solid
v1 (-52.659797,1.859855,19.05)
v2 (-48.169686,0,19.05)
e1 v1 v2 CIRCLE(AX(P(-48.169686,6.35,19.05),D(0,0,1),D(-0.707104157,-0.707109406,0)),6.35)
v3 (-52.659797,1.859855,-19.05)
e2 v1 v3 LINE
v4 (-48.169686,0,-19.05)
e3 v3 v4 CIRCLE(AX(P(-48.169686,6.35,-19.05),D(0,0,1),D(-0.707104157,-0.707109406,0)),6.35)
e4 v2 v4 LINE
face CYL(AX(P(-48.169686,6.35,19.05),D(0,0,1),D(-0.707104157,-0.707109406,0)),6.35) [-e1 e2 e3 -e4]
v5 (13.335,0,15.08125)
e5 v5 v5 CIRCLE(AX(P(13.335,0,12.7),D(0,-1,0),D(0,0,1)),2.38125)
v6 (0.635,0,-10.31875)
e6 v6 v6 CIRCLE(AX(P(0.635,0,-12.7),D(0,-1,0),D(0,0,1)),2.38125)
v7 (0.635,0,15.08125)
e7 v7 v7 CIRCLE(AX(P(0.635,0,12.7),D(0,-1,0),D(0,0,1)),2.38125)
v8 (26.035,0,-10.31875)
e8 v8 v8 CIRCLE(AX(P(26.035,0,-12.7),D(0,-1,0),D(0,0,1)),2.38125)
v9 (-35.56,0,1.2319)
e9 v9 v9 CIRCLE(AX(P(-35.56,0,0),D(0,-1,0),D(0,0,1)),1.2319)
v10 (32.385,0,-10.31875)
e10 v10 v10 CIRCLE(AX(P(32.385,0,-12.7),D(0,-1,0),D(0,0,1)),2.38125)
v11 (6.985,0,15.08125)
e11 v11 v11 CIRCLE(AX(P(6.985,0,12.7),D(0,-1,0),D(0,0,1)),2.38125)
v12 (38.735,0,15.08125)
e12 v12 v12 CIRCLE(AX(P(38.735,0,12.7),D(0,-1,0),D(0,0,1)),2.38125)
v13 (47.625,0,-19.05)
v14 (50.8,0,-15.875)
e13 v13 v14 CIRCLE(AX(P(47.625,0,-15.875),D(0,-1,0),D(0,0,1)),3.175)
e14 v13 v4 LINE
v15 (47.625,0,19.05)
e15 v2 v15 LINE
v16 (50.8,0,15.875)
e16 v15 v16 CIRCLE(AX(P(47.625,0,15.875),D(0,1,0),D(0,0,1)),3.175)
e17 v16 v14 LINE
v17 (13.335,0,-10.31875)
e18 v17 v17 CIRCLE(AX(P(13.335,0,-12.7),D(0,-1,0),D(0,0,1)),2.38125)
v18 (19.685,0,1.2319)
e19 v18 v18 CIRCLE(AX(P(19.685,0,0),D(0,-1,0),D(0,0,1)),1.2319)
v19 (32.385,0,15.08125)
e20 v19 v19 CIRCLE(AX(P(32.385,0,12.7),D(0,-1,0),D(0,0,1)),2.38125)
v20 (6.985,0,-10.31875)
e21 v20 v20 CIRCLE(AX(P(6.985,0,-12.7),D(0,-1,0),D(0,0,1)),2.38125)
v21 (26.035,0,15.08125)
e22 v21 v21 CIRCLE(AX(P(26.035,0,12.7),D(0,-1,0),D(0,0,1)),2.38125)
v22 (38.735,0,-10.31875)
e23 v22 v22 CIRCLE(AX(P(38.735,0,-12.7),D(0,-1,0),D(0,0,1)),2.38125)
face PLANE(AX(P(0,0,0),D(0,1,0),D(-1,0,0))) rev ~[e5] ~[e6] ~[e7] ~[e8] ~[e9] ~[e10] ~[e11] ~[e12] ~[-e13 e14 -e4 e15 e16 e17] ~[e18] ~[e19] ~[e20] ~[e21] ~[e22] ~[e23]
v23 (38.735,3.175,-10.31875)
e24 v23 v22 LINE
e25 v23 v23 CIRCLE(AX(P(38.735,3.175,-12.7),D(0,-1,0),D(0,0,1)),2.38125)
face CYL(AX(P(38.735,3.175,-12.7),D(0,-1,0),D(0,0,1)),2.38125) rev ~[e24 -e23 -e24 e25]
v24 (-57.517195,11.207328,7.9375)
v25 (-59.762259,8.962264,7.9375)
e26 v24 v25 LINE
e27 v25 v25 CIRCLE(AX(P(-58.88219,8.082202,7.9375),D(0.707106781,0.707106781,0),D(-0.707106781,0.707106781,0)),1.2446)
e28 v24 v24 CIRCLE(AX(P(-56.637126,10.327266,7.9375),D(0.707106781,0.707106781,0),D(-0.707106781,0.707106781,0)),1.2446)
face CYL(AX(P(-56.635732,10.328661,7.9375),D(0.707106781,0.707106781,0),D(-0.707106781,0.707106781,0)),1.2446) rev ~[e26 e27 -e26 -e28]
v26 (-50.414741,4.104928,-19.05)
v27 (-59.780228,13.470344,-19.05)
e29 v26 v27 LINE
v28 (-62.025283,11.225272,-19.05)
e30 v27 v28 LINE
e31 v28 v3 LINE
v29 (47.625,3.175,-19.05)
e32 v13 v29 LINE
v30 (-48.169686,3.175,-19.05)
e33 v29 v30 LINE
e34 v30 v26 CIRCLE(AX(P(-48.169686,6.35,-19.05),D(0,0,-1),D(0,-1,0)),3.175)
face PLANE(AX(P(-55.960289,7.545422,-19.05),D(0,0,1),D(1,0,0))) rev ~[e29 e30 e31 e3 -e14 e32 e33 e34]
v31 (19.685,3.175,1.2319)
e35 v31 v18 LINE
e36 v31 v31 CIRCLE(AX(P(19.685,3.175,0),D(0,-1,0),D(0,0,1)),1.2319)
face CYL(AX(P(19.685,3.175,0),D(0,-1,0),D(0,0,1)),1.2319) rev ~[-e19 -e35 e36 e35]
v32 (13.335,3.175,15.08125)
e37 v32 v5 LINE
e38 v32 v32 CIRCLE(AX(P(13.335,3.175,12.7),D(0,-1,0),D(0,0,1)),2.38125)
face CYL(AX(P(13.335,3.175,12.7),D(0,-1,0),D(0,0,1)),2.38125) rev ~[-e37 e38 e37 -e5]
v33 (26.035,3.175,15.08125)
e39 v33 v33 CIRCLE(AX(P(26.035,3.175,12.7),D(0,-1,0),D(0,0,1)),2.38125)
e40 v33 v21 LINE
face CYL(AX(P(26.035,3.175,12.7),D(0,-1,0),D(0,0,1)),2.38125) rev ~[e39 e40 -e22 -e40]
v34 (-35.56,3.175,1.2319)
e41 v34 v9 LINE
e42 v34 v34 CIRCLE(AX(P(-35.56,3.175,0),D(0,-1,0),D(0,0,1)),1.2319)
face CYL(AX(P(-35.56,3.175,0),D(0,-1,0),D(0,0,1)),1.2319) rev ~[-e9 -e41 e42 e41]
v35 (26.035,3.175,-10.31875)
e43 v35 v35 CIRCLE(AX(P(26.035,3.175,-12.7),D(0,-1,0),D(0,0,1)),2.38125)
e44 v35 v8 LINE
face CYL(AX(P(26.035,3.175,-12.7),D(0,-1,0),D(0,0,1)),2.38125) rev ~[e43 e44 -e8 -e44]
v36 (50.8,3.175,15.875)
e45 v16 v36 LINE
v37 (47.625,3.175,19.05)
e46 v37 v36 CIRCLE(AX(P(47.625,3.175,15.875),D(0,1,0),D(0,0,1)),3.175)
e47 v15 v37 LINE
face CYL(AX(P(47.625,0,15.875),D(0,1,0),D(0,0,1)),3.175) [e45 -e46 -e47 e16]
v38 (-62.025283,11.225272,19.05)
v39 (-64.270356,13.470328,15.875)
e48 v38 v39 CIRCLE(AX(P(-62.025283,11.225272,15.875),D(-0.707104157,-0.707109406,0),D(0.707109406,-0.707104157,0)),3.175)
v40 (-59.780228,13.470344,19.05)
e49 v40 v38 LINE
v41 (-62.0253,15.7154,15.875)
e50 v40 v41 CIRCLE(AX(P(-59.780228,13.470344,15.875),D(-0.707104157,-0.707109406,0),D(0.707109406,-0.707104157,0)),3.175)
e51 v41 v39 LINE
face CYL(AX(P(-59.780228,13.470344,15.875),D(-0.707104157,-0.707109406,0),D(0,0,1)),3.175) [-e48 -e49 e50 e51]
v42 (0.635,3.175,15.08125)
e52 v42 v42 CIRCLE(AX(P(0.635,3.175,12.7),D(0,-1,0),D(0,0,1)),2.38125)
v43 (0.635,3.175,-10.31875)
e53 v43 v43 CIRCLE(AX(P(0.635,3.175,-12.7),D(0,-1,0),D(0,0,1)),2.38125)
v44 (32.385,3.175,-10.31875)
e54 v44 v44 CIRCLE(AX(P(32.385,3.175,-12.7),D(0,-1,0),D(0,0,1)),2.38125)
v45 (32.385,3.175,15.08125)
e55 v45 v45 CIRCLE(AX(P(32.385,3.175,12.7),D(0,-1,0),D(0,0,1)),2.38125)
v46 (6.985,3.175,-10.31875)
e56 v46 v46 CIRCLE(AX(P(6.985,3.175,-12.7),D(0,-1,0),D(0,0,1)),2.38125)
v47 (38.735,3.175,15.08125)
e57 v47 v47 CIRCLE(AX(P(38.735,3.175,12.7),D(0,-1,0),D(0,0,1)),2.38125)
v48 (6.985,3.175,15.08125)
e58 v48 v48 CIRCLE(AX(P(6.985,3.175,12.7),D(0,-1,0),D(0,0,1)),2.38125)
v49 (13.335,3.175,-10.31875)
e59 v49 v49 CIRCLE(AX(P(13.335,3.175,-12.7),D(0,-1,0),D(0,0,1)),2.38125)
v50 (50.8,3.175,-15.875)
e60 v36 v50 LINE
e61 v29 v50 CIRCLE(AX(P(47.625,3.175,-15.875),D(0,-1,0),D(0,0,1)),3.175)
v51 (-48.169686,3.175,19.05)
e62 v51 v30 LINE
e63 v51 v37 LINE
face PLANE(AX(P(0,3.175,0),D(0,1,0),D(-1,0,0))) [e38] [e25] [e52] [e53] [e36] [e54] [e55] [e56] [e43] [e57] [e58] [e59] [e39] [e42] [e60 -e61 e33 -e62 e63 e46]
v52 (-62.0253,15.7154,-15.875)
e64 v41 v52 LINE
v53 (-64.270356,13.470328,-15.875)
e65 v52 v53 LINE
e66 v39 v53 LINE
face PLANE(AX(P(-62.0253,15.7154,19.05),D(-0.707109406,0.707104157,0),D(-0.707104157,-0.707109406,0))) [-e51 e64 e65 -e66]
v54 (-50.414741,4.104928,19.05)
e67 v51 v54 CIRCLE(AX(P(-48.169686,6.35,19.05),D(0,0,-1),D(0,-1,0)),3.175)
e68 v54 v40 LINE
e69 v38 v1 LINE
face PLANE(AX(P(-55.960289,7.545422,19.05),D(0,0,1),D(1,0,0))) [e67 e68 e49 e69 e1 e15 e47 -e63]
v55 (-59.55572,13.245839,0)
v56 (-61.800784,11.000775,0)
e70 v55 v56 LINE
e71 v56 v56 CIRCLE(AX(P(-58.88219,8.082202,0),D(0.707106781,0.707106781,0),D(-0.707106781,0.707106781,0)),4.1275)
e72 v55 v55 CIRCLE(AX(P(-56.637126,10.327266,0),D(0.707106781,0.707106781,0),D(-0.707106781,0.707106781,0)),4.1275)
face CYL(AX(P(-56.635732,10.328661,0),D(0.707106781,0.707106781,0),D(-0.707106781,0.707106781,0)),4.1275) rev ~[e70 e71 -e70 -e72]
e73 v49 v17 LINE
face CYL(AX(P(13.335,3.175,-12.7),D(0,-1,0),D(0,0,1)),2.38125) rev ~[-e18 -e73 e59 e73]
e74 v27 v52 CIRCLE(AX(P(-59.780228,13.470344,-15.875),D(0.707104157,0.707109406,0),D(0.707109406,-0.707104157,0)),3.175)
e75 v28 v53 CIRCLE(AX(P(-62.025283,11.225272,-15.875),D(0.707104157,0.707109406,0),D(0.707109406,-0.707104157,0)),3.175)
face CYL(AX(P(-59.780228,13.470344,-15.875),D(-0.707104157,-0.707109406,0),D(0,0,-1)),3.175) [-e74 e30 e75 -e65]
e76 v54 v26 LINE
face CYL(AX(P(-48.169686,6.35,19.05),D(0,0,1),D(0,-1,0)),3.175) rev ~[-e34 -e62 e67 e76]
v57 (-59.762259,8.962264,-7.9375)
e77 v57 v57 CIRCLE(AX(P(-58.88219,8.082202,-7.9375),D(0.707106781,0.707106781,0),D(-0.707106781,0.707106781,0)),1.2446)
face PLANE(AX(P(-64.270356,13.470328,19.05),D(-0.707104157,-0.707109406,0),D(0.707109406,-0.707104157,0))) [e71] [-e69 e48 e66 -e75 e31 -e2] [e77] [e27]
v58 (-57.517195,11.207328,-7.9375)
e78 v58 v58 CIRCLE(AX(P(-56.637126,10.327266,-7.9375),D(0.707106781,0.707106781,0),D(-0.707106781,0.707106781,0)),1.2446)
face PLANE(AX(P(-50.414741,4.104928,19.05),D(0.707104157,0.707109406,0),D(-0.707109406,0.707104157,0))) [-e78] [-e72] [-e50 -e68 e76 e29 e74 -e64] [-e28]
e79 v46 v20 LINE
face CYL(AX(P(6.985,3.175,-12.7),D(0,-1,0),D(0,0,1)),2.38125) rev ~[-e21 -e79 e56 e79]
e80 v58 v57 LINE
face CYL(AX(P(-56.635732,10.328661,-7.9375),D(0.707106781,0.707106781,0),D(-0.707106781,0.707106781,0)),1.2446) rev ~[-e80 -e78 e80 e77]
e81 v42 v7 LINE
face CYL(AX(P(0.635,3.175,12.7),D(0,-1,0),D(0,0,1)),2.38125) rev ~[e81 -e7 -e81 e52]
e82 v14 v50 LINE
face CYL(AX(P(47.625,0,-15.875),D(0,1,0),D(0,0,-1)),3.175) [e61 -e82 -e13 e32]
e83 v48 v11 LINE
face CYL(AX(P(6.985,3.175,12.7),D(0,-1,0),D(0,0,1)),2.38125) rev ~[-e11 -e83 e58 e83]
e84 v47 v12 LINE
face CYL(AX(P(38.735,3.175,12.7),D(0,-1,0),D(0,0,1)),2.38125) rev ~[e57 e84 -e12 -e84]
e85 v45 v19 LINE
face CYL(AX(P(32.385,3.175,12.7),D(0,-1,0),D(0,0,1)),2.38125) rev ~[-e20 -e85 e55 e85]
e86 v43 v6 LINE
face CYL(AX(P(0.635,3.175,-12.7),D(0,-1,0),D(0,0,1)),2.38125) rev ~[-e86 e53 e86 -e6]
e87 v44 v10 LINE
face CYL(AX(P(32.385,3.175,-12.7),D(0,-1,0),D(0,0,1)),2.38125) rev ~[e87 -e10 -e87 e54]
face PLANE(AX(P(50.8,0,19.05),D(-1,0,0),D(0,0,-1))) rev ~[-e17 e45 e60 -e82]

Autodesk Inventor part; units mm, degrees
ref_plane "YZ Plane" through (0, 0, 0) normal (1, 0, 0) x (0, 1, 0)
ref_plane "XZ Plane" through (0, 0, 0) normal (0, 1, 0) x (-1, 0, 0)
ref_plane "XY Plane" through (0, 0, 0) normal (0, 0, 1) x (1, 0, 0)
sketch "Sketch1" plane through (0, 0, 0) normal (0, 1, 0) x (-1, 0, 0)
  line L0 (-50.8, -19.05) -> (50.8, -19.05)
  line L1 (50.8, -19.05) -> (50.8, 19.05)
  line L2 (50.8, 19.05) -> (-50.8, 19.05)
  line L3 (-50.8, 19.05) -> (-50.8, -19.05)
  line L4 (-50.8, -19.05) -> (50.8, 19.05) construction
  line L5 (50.8, -19.05) -> (-50.8, 19.05) construction
  point P0 (0, 0)
  dimension "d0" = 38.1
  dimension "d1" = 101.6
extrude "Plate1" add sketch "Sketch1" along normal blind 3.175
sketch "Sketch2" plane through (-48.5549, 2.2451, 19.05) normal (-0.7071068, -0.7071068, 0) x (0.7071068, -0.7071068, 0)
  line L0 (0, -38.1) -> (0, 0)
  line L1 (0, 0) -> (-19.05, 0)
  line L2 (-19.05, 0) -> (-19.05, -38.1)
  line L3 (-19.05, -38.1) -> (0, -38.1)
edge flange "Flange1" height 19.05 angle 45 thickness 3.175 bend radius 3.175 thickness toward (-0.7071068, -0.7071068, 0) relief tear relief width 3.175 relief depth 1.5875 edges at (-50.8, 3.175, 0) wall of the first edge with corners at (-48.5549, 2.2451, -19.05) (-48.5549, 2.2451, 19.05) (-62.0253, 15.7154, 19.05) (-62.0253, 15.7154, -19.05)
bend "Bend1"
corner "Corner1"
sketch "Sketch3" plane through (-62.0253, 15.7154, -19.05) normal (0.7071068, 0.7071068, 0) x (-0.7071068, 0.7071068, 0)
  circle A0 centre (-7.62, 19.05) radius 4.1275
  circle A1 centre (-7.62, 26.9875) radius 1.2446
  circle A2 centre (-7.62, 11.1125) radius 1.2446
  line L0 (-132.4339, 19.05) -> (42.7893, 19.05) projected
  line L1 (0, 0) -> (0, 38.1) projected
  point P0 (-54.971, 19.05)
  dimension "d13" = 8.255
  dimension "d14" = 2.4892
  dimension "d15" = 7.9375
  dimension "d16" = 7.9375
  dimension "d17" = 7.62
extrude "Cut1" cut sketch "Sketch3" against normal blind 3.175
sketch "Sketch4" plane through (0, 3.175, 0) normal (0, 1, 0) x (1, 0, 0)
  line L0 (32.385, -12.7) -> (6.985, -12.7)
  line L1 (6.985, -12.7) -> (6.985, 12.7)
  line L2 (6.985, 12.7) -> (32.385, 12.7)
  line L3 (32.385, 12.7) -> (32.385, -12.7)
  line L4 (32.385, -12.7) -> (6.985, 12.7) construction
  line L5 (6.985, -12.7) -> (32.385, 12.7) construction
  line L6 (50.8, 19.05) -> (50.8, -19.05) projected
  point P0 (0, 0)
  point P1 (19.685, 0)
  point P2 (32.385, -12.7)
  point P3 (38.735, -12.7)
  point P4 (26.035, -12.7)
  point P5 (13.335, -12.7)
  point P6 (0.635, -12.7)
  point P7 (13.335, 12.7)
  point P8 (0.635, 12.7)
  point P9 (26.035, 12.7)
  point P10 (38.735, 12.7)
  point P11 (-35.56, 0)
  point P12 (19.685, 0)
  point P13 (19.685, 0)
  dimension "d20" = 25.4
  dimension "d21" = 25.4
  dimension "d32" = 19.685
  dimension "d33" = 6.35
  dimension "d34" = 6.35
  dimension "d35" = 6.35
  dimension "d36" = 6.35
  dimension "d37" = 35.56
hole "Hole1" at (6.985, 3.175, -12.7) at (32.385, 3.175, -12.7) at (32.385, 3.175, 12.7) at (6.985, 3.175, 12.7) at (38.735, 3.175, 12.7) at (26.035, 3.175, 12.7) at (38.735, 3.175, -12.7) at (13.335, 3.175, -12.7) at (26.035, 3.175, -12.7) at (0.635, 3.175, -12.7) at (0.635, 3.175, 12.7) at (13.335, 3.175, 12.7) direction (0, -1, 0) diameter 4.7625 depth 3.175 tip angle 118
fillet "Corner Round1" radius 3.175 4 edges at (-63.1479, 14.5929, -19.05) (-63.1479, 14.5929, 19.05) (50.8, 1.5875, -19.05) (50.8, 1.5875, 19.05)
sketch "Sketch5" plane through (0, 0, 0) normal (0, 0, 1) x (1, 0, 0)
  line L0 (-104.5658, 0) -> (17.4276, 0) projected
  line L1 (17.4757, 84.4402) -> (-106.4259, -39.4614) projected
  line L2 (-52.6599, 1.8599) -> (-62.0253, 11.2253) projected
  line L3 (-58.8822, 8.0822) -> (-90.3131, -23.3487)
  point P0 (0, 0)
  dimension "d31" = 44.45
hole "Hole2" at (-35.56, 3.175, 0) at (19.685, 3.175, 0) direction (0, -1, 0) diameter 2.4638 end through all
equation "\"d18\" = Thickness"
equation "\"d28\" = Thickness"
equation "\"d3\" = BendReliefWidth"
equation "\"d4\" = BendReliefDepth"
equation "\"d5\" = MinimumRemnant"
equation "\"d6\" = BendRadius"
equation "\"d9\" = BendRadius"
equation "\"d10\" = CornerReliefSize"
equation "\"d11\" = GapSize"
equation "\"d12\" = JacobiRadiusSize"
equation "\"BendRadius\" = Thickness"
equation "\"BendReliefWidth\" = Thickness"
equation "\"BendReliefDepth\" = 0.5 * Thickness"
equation "\"CornerReliefSize\" = 4 * Thickness"
equation "\"MinimumRemnant\" = 2 * Thickness"
equation "\"TransitionRadius\" = BendRadius"
equation "\"JacobiRadiusSize\" = BendRadius"
equation "\"GapSize\" = Thickness"
equation "\"d2\" = BendRadius"
equation "\"Thickness\" = 3.175"
properties part number "J005232" material "ALUMINUM, 5052-H32"
